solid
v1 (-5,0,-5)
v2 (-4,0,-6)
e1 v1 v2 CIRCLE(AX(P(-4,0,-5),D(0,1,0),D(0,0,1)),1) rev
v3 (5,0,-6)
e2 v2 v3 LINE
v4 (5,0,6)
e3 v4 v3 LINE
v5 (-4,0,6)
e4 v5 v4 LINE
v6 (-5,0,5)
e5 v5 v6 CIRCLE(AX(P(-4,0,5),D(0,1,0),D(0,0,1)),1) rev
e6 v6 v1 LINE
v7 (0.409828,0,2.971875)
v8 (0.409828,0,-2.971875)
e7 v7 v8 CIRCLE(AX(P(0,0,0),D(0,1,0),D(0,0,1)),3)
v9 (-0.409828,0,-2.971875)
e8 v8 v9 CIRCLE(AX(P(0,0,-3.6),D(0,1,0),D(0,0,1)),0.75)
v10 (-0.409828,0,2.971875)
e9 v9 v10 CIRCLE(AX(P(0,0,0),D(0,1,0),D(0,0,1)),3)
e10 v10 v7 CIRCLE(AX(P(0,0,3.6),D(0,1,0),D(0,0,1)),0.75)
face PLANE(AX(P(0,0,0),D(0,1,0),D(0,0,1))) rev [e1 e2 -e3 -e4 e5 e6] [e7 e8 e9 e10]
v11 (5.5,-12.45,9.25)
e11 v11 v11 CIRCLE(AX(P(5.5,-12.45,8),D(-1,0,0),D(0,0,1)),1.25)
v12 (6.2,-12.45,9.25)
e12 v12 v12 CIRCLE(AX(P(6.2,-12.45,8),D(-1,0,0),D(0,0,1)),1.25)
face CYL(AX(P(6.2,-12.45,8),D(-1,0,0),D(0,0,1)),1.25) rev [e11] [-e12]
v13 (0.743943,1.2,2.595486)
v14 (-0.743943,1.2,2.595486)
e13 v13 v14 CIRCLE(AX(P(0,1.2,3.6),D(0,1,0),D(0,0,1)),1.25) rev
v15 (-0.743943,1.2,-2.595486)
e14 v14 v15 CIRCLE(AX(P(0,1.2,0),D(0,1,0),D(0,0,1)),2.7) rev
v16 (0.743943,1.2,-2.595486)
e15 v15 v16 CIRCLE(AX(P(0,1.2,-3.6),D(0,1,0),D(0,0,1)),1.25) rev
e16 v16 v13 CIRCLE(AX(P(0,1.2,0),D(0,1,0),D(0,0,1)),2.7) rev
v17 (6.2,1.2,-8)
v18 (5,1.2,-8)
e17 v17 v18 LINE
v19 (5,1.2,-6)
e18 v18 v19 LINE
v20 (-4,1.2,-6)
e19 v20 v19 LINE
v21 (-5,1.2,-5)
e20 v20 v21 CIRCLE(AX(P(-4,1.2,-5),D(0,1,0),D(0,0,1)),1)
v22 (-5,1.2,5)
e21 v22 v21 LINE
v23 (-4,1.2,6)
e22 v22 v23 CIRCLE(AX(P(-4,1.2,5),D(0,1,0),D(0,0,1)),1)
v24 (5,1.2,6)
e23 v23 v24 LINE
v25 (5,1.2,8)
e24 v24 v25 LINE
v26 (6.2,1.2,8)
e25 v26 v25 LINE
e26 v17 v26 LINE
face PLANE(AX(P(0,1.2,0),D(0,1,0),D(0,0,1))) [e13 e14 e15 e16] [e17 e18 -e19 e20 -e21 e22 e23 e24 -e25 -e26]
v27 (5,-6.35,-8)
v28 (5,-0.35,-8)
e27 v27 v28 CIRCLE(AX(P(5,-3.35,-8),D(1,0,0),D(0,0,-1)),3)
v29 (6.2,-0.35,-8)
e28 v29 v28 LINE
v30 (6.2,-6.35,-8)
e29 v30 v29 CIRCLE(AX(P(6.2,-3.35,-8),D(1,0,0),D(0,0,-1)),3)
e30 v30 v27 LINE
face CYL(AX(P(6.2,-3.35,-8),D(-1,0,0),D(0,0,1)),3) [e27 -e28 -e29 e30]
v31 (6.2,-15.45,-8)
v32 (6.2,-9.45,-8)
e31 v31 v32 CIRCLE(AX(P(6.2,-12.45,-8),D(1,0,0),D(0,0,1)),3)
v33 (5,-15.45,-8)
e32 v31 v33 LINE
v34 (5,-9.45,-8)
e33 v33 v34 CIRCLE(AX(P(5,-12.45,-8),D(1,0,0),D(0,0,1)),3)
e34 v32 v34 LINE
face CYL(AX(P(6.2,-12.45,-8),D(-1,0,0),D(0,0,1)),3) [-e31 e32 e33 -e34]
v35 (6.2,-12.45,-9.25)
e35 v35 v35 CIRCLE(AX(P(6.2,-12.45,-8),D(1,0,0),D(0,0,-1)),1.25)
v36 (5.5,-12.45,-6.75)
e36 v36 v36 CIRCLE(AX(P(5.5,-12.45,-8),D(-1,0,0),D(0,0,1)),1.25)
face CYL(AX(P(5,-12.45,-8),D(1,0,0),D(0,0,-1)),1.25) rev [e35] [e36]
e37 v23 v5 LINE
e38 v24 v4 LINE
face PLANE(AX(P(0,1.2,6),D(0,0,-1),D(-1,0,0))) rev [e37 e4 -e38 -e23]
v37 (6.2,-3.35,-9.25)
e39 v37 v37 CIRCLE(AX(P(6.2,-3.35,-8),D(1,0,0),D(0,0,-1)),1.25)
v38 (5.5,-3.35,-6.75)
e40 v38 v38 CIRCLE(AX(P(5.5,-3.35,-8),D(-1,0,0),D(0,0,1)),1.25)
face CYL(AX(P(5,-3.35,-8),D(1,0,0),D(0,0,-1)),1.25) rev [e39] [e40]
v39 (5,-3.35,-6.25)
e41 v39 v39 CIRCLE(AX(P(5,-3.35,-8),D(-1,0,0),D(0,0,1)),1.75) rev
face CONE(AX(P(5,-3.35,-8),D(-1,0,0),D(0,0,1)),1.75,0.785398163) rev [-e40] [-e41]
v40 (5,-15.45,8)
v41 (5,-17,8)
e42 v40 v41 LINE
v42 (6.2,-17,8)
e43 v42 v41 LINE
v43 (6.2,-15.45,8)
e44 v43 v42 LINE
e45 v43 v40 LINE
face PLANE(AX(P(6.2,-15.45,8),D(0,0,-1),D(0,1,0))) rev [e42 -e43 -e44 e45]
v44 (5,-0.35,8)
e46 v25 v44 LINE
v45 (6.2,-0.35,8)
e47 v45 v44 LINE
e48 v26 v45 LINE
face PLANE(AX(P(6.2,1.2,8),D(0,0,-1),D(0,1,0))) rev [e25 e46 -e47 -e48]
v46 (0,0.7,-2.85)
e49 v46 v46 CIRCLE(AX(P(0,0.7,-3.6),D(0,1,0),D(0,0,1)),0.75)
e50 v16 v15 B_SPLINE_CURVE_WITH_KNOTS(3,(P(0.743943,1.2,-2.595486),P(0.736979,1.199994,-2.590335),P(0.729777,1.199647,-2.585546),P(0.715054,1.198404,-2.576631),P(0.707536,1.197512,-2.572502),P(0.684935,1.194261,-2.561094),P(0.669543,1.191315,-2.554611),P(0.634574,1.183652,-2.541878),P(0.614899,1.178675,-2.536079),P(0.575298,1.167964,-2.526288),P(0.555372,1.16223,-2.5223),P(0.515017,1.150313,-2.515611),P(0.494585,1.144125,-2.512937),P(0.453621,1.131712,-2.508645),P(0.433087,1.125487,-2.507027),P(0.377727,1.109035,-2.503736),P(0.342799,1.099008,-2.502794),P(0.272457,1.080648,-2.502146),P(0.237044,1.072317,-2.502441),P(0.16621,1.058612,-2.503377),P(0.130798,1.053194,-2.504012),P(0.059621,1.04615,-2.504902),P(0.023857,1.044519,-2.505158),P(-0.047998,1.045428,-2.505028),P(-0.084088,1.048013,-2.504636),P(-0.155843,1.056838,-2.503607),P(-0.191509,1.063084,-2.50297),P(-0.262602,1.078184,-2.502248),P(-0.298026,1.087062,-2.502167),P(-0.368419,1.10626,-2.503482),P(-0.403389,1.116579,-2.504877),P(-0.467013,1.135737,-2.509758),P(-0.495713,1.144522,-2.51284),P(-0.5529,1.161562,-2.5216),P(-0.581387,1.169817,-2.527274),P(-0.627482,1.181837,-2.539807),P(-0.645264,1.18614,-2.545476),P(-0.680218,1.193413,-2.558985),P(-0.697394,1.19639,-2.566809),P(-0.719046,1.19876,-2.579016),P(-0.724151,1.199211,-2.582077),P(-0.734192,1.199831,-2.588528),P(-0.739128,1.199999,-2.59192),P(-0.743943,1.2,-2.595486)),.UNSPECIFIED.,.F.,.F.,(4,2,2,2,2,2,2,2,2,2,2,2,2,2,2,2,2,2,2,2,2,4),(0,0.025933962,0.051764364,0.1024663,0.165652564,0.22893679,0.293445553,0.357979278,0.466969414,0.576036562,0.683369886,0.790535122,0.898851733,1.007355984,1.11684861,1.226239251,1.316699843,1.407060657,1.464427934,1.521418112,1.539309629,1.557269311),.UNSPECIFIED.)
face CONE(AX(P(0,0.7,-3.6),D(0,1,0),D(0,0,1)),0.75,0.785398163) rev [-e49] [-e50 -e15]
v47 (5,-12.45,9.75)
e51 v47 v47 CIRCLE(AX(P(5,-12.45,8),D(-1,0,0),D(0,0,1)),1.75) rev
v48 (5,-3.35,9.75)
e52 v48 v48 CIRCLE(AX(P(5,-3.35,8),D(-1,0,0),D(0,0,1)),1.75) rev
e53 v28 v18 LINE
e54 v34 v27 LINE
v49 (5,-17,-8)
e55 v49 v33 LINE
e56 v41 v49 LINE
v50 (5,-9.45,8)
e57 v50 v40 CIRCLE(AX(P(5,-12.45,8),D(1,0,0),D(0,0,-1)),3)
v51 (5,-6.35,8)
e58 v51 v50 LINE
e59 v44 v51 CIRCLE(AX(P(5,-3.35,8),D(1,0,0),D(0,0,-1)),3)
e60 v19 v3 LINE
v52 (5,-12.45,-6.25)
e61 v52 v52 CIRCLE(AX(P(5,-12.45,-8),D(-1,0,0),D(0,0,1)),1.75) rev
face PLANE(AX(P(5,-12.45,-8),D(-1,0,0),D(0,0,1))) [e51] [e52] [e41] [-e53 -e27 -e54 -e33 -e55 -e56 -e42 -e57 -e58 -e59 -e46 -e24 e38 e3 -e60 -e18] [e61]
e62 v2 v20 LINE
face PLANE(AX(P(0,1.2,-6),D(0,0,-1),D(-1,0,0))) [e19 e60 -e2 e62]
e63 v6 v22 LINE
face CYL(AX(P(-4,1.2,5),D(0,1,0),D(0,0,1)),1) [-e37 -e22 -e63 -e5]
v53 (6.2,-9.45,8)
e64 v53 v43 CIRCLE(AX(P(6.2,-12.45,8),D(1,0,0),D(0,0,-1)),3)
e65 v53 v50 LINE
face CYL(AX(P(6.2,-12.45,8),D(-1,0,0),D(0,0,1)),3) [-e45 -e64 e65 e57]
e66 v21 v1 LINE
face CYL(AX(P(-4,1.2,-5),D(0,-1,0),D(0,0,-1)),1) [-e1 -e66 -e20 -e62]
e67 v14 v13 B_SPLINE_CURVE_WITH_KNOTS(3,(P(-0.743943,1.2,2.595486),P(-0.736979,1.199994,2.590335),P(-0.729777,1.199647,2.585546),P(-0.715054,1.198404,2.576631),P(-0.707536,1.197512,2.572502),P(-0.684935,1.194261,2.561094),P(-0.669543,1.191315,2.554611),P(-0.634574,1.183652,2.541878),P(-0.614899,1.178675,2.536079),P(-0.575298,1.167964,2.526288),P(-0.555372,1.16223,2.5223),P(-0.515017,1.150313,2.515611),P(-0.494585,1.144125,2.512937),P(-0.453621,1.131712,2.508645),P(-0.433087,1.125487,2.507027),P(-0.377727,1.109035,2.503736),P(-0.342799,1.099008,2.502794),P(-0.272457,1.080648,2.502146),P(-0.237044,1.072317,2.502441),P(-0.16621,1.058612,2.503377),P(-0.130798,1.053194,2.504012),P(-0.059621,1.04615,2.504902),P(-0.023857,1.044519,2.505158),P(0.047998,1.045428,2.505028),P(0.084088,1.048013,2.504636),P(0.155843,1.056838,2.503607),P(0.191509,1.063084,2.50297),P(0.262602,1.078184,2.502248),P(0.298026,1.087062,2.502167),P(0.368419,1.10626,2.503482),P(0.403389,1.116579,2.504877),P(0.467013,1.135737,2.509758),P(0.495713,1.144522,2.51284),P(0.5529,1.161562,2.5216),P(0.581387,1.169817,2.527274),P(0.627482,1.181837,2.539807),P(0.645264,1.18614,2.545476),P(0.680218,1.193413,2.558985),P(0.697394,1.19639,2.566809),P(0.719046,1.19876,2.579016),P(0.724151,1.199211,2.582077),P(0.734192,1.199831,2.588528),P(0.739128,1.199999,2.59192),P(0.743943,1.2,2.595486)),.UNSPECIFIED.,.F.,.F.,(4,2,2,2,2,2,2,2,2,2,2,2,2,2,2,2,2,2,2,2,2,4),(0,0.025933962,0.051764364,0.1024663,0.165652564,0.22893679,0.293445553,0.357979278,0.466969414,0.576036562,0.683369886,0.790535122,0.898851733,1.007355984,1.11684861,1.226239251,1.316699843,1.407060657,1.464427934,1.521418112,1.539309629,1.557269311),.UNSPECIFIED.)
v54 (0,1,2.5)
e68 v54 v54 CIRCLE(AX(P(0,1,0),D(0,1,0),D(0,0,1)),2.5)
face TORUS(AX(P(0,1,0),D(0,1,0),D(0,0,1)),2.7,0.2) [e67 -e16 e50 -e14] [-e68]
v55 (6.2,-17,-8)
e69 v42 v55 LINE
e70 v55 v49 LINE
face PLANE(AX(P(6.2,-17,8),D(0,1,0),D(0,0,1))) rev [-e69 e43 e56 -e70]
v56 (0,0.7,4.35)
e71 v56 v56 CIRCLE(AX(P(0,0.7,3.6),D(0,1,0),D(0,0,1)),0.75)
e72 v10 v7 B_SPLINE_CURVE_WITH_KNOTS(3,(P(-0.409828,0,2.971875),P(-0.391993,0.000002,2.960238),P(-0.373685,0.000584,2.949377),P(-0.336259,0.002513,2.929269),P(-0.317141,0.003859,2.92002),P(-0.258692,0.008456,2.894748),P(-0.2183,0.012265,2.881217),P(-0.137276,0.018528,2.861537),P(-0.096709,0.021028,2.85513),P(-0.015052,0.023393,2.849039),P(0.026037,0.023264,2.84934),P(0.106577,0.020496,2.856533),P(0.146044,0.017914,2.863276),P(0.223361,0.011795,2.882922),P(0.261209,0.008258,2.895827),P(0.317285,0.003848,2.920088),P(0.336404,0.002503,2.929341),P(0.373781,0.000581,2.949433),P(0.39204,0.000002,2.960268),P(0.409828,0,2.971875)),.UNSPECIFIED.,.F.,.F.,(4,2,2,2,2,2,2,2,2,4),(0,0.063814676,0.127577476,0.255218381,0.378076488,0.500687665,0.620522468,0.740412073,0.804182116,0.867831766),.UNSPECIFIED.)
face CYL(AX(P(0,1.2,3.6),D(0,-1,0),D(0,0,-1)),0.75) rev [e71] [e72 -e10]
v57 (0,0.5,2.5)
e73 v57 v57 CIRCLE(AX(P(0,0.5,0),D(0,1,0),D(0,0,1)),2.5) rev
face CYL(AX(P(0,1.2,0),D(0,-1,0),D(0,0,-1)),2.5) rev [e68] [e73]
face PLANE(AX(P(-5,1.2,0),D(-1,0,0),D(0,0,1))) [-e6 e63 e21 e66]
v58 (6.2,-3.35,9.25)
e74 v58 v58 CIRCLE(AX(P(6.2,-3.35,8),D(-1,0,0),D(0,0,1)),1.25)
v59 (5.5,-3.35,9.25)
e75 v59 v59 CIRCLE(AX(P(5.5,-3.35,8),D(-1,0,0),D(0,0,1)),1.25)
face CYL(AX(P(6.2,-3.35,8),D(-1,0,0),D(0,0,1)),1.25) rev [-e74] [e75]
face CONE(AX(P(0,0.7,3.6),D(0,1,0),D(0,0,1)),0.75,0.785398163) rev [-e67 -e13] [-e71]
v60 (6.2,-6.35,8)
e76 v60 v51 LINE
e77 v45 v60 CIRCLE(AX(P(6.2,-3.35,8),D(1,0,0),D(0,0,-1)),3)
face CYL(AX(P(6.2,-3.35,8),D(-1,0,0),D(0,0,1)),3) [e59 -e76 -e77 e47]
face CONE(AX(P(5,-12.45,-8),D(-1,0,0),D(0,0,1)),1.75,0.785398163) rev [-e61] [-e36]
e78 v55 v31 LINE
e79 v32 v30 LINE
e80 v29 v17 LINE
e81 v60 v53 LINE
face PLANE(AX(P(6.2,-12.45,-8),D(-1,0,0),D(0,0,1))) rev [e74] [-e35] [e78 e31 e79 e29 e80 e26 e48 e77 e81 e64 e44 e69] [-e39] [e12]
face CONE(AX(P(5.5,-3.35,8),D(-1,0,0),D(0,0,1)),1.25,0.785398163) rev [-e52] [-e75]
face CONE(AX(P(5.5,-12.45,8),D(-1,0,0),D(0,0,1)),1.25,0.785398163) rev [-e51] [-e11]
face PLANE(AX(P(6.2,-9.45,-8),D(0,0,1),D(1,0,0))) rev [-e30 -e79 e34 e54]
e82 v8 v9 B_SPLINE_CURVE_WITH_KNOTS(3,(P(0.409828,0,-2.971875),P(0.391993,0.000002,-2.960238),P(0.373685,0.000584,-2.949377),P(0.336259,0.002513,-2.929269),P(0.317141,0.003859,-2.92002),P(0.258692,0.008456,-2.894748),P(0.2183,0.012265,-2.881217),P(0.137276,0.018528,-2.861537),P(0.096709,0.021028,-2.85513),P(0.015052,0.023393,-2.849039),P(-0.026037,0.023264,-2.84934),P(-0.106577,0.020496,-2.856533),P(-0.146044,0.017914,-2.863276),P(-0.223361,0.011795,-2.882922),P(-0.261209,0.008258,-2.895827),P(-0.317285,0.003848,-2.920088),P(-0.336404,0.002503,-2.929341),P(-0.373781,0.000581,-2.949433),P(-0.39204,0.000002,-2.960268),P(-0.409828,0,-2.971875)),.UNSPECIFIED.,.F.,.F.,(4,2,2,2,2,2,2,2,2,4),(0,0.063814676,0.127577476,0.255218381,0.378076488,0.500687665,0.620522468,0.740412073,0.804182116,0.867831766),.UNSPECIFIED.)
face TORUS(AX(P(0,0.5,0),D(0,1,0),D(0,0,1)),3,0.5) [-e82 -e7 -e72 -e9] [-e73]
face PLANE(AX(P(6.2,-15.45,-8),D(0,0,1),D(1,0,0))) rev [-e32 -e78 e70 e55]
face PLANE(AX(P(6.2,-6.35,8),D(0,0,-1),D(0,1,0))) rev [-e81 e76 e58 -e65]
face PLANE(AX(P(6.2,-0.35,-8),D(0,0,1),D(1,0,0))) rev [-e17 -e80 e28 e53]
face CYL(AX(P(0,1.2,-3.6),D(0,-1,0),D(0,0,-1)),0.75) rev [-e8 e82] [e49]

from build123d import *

# Parameters (mm, degrees)
SKETCH1_R           = 0.75
SKETCH1_R_2         = 2.5
BOSS_EXTRUDE3_DEPTH = 1.2
FILLET10_R          = 1
FILLET11_R          = 1
BOSS_EXTRUDE5_DEPTH = 1.2
SKETCH6_R           = 1.25
CUT_EXTRUDE3_DEPTH  = 1.2
SKETCH7_R           = 1.25
CUT_EXTRUDE4_DEPTH  = 1.2
CHAMFER5_SIZE       = 0.5
CHAMFER6_SIZE       = 0.5
FILLET13_R          = 0.5
FILLET14_R          = 0.2
CHAMFER7_SIZE       = 0.5
CHAMFER8_SIZE       = 0.5


with BuildPart() as part:
    # Sketch1 → Boss-Extrude3 (new body)
    with BuildSketch(Plane(origin=(0, 0, 0), x_dir=(1, 0, 0), z_dir=(0, 1, 0))):
        Polygon((5, 6), (0, 6), (-5, 6), (-5, -6), (5, -6), align=None)
        with Locations(Location((0, -3.6, 0), (0, 0, 270))):
            Circle(SKETCH1_R, mode=Mode.SUBTRACT)
        with Locations(Location((0, 0, 0), (0, 0, 270))):
            Circle(SKETCH1_R_2, mode=Mode.SUBTRACT)
        with Locations(Location((0, 3.6, 0), (0, 0, 270))):
            Circle(SKETCH1_R, mode=Mode.SUBTRACT)
    extrude(amount=BOSS_EXTRUDE3_DEPTH)

    # Fillet10
    fillet10_edges = [part.edges().sort_by_distance(p)[0] for p in [
        (-5, 0.6, 6),
    ]]
    fillet(fillet10_edges, radius=FILLET10_R)

    # Fillet11
    fillet11_edges = [part.edges().sort_by_distance(p)[0] for p in [
        (-5, 0.6, -6),
    ]]
    fillet(fillet11_edges, radius=FILLET11_R)

    # Sketch5 → Boss-Extrude5 (add)
    with BuildSketch(Plane(origin=(5, 0, 0), x_dir=(0, 0, -1), z_dir=(1, 0, 0))):
        with BuildLine():
            Line((6, 1.2), (-6, 1.2))
            Line((-6, 1.2), (-8, 1.2))
            Line((-8, 1.2), (-8, -0.35))
            ThreePointArc((-8, -0.35), (-11, -3.35), (-8, -6.35))
            Line((-8, -6.35), (-8, -9.45))
            ThreePointArc((-8, -9.45), (-11, -12.45), (-8, -15.45))
            Line((-8, -15.45), (-8, -17))
            Line((-8, -17), (8, -17))
            Line((8, -17), (8, -15.45))
            ThreePointArc((8, -15.45), (11, -12.45), (8, -9.45))
            Line((8, -9.45), (8, -6.35))
            ThreePointArc((8, -6.35), (11, -3.35), (8, -0.35))
            Line((8, -0.35), (8, 1.2))
            Line((8, 1.2), (6, 1.2))
        make_face()
    extrude(amount=BOSS_EXTRUDE5_DEPTH)

    # Sketch6 → Cut-Extrude3 (cut)
    with BuildSketch(Plane(origin=(6.2, 0, 0), x_dir=(0, 0, -1), z_dir=(1, 0, 0))):
        with Locations((8, -3.35)):
            Circle(SKETCH6_R)
        with Locations((8, -12.45)):
            Circle(SKETCH6_R)
    extrude(amount=-CUT_EXTRUDE3_DEPTH, mode=Mode.SUBTRACT)

    # Sketch7 → Cut-Extrude4 (cut)
    with BuildSketch(Plane.ZY.offset(-5)):
        with Locations((8, -12.45)):
            Circle(SKETCH7_R)
        with Locations((8, -3.35)):
            Circle(SKETCH7_R)
    extrude(amount=-CUT_EXTRUDE4_DEPTH, mode=Mode.SUBTRACT)

    # Chamfer5
    chamfer5_edges = [part.edges().sort_by_distance(p)[0] for p in [
        (5, -3.35, 6.75),
    ]]
    chamfer(chamfer5_edges, length=CHAMFER5_SIZE)

    # Chamfer6
    chamfer6_edges = [part.edges().sort_by_distance(p)[0] for p in [
        (5, -3.35, -6.75),
        (5, -12.45, -6.75),
        (5, -12.45, 6.75),
    ]]
    chamfer(chamfer6_edges, length=CHAMFER6_SIZE)

    # Fillet13
    # the kernel refuses this fillet: 0.5 mm, written as the material it takes off along each edge
    with BuildSketch(Plane(origin=(0, 0, 0), x_dir=(0, 0, 1), z_dir=(-1, 0, 0))) as fillet13_piece_1:
        with BuildLine():
            CenterArc((2.5 + FILLET13_R, FILLET13_R), FILLET13_R, 180, 90)
            Line((2.5, FILLET13_R), (2.5, 0))
            Line((2.5, 0), (2.5 + FILLET13_R, 0))
        make_face()
    revolve(axis=Axis((0, 0, 0), (0, 1, 0)), mode=Mode.SUBTRACT)

    # Fillet14
    fillet14_edges = [part.edges().sort_by_distance(p)[0] for p in [
        (0, 1.2, -2.5),
    ]]
    fillet(fillet14_edges, radius=FILLET14_R)

    # Chamfer7
    # the kernel refuses this chamfer: 0.5 mm, written as the material it takes off along each edge
    with BuildSketch(Plane(origin=(0, 1.2, 3.6), x_dir=(0, 0, 1), z_dir=(-1, 0, 0))) as chamfer7_piece_1:
        Polygon((0.75 + CHAMFER7_SIZE, 0), (0.75, -CHAMFER7_SIZE), (0.75, 0), align=None)
    revolve(axis=Axis((0, 1.2, 3.6), (0, 1, 0)), mode=Mode.SUBTRACT)

    # Chamfer8
    # the kernel refuses this chamfer: 0.5 mm, written as the material it takes off along each edge
    with BuildSketch(Plane(origin=(0, 1.2, -3.6), x_dir=(0, 0, 1), z_dir=(-1, 0, 0))) as chamfer8_piece_1:
        Polygon((0.75 + CHAMFER8_SIZE, 0), (0.75, -CHAMFER8_SIZE), (0.75, 0), align=None)
    revolve(axis=Axis((0, 1.2, -3.6), (0, 1, 0)), mode=Mode.SUBTRACT)


solid = part.part
